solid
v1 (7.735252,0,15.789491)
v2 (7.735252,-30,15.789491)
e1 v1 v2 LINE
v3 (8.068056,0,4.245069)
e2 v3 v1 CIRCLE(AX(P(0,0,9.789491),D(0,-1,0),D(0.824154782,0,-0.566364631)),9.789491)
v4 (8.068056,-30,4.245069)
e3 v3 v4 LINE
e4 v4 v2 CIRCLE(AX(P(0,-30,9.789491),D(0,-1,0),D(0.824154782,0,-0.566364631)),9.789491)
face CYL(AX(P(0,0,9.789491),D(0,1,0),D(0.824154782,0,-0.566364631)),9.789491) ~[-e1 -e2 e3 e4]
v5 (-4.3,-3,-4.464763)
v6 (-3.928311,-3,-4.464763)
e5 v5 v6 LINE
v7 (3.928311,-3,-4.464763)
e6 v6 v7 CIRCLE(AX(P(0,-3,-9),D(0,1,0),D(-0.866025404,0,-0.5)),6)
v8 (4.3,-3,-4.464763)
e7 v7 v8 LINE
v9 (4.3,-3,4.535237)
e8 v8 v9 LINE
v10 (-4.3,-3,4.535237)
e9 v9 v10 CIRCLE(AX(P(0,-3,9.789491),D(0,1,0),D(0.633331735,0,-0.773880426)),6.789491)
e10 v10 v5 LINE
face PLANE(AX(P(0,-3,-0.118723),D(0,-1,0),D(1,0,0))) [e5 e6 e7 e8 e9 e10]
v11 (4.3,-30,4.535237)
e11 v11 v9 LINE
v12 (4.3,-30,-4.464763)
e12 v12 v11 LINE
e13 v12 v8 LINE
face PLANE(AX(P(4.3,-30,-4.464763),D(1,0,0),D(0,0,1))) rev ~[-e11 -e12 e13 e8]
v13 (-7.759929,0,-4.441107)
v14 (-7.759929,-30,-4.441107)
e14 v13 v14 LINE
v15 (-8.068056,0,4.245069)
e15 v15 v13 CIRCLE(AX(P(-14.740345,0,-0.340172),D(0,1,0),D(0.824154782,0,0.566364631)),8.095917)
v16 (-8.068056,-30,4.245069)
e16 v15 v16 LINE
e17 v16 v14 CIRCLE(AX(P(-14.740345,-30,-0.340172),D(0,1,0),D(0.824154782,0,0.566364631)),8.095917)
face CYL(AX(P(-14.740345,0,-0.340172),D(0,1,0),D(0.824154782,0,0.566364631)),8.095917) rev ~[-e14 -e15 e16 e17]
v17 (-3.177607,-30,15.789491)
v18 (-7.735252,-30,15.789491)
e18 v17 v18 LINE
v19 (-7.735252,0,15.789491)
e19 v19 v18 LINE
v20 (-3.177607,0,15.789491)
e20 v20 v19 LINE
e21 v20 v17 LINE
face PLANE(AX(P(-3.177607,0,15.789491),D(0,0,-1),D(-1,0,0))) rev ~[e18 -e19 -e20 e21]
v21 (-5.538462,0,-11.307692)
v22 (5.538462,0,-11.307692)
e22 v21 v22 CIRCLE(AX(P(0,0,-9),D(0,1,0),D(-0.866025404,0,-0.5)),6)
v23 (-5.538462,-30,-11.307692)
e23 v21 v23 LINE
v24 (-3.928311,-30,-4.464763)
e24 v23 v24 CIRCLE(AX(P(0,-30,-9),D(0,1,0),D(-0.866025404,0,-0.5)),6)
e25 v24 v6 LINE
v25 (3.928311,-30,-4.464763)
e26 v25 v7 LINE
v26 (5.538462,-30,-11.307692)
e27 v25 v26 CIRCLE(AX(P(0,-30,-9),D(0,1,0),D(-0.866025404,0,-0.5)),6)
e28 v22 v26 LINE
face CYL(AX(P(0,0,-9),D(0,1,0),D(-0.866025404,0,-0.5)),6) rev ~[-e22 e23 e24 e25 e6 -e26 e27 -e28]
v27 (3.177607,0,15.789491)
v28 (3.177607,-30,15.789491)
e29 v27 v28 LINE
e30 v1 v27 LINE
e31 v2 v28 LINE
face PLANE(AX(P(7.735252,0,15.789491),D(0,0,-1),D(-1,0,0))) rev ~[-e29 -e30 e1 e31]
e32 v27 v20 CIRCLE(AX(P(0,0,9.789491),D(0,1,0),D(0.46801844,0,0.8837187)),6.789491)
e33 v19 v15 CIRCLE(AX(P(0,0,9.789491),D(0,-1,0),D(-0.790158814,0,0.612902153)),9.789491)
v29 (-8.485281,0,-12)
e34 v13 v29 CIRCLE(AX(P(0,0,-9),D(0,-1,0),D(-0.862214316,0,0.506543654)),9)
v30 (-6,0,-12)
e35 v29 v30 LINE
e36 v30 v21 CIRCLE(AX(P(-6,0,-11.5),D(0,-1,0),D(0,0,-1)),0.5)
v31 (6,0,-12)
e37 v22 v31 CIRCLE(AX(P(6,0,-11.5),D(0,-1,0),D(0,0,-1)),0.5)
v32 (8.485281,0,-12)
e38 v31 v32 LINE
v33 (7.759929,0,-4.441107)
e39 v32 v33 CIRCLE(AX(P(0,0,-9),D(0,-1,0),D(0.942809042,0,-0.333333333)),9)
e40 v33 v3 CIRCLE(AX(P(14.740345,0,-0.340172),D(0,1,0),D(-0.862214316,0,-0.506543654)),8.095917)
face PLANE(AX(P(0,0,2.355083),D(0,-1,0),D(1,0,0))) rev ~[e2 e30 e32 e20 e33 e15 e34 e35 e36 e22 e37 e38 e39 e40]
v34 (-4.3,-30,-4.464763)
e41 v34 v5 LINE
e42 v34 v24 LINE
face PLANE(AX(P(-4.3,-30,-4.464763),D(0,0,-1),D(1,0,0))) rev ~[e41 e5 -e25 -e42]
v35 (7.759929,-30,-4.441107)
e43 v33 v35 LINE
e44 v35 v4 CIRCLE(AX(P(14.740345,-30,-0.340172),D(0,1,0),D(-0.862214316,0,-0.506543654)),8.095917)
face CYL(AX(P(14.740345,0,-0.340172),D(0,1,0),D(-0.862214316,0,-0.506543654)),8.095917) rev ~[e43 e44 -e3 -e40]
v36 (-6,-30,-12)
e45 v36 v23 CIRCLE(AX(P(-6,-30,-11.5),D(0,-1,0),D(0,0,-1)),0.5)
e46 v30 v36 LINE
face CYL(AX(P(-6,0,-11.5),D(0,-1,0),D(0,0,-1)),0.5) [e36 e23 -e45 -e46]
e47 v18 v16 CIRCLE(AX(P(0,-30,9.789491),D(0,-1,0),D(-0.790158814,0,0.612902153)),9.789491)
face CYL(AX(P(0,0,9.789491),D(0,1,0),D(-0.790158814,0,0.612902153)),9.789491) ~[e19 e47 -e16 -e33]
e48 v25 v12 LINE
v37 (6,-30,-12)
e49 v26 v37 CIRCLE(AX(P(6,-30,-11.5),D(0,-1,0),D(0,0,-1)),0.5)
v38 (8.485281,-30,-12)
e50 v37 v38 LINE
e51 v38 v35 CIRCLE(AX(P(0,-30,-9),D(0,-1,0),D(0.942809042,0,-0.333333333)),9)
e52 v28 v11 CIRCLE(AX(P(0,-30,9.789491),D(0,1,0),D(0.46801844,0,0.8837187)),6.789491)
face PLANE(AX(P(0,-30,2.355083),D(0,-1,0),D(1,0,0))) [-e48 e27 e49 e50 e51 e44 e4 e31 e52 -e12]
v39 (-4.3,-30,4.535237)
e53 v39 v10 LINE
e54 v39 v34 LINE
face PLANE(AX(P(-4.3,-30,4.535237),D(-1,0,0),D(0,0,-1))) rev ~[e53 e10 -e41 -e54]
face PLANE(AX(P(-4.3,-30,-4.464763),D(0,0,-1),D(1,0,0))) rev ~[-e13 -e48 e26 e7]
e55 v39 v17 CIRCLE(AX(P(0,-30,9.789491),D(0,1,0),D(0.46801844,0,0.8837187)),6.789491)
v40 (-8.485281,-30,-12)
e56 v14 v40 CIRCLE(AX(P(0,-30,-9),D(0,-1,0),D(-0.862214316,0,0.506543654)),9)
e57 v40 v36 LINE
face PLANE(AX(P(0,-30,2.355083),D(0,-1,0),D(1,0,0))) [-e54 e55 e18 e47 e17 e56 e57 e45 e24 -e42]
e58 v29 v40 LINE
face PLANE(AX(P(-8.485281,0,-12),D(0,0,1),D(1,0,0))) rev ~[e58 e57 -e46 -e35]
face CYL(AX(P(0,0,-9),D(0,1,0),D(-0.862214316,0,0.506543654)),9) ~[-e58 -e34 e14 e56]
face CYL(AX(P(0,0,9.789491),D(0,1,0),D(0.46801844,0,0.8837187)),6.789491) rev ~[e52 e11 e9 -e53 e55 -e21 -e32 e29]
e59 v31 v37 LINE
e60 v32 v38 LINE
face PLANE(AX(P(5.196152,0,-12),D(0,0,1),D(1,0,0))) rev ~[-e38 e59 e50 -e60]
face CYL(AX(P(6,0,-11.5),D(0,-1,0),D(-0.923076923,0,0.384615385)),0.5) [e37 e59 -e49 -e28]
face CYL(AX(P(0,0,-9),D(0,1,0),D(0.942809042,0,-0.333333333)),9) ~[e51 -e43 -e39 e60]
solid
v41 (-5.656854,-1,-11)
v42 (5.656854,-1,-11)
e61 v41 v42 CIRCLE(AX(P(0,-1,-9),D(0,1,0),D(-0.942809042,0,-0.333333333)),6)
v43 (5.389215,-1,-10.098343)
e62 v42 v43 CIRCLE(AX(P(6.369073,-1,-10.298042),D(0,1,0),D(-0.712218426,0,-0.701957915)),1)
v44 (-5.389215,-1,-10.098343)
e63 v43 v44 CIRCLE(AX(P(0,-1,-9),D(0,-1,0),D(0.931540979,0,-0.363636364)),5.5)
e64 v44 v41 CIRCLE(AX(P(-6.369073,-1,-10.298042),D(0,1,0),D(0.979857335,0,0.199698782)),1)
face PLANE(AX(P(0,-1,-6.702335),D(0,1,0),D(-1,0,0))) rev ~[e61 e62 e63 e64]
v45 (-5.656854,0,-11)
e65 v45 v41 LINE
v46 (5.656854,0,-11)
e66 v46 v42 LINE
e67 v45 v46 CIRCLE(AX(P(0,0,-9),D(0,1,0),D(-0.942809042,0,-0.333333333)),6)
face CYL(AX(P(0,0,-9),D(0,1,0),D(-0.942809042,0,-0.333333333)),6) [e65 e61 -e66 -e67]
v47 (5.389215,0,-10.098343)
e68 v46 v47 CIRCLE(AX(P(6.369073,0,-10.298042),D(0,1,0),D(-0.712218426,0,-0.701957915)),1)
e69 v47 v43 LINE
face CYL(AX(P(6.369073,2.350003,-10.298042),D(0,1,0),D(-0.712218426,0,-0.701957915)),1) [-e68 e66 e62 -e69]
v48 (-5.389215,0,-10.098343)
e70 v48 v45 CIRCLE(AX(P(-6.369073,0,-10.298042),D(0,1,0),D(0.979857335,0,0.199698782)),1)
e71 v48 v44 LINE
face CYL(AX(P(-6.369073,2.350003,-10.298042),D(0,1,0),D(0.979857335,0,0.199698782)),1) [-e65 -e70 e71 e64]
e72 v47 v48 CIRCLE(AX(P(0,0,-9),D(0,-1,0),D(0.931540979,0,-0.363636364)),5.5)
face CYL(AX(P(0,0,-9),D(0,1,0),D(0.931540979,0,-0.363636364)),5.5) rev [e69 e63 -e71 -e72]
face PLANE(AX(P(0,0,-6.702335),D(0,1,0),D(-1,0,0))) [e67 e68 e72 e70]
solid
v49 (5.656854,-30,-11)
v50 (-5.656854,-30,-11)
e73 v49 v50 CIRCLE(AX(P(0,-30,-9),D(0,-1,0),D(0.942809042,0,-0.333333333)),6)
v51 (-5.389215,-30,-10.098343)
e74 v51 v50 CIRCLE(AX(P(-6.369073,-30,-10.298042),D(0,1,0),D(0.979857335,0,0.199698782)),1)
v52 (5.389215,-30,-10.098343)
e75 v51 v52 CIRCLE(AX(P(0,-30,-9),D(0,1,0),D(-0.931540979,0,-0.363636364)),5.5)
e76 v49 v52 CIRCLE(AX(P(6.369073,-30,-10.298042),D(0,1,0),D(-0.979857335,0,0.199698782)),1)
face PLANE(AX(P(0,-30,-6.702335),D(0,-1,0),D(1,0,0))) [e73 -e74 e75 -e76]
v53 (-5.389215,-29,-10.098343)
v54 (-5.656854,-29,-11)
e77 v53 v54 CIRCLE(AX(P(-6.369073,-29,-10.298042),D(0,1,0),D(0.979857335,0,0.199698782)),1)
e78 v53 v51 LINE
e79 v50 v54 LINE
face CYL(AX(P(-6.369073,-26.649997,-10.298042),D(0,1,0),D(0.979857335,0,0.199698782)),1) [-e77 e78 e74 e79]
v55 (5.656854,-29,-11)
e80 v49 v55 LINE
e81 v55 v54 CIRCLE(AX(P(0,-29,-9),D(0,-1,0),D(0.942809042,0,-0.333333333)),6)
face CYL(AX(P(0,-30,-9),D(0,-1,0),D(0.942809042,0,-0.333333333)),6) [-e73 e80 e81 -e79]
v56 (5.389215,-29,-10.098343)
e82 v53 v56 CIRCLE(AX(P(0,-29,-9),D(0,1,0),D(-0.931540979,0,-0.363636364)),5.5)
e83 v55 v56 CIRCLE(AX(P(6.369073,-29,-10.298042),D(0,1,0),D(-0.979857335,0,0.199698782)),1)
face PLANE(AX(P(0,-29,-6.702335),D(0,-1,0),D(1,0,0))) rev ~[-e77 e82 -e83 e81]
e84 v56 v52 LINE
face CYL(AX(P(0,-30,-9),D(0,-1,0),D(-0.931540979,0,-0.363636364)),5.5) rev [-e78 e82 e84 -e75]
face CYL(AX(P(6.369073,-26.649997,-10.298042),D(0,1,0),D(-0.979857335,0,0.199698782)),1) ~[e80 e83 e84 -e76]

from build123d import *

# Parameters (mm, degrees)
F1_DEPTH      = 30
F3_DEPTH      = 27
F5_DEPTH      = 1
F7_DEPTH      = 1
F8_T1_DEPTH   = 5.7000067135
F8_2_T1_DEPTH = 5.7000067135
F9_R          = 0.5


# Not quite as in the source:
# - a fillet or chamfer that OpenCascade refuses, or shapes differently, is made with other operations: its cross-section is extruded or revolved along the edge and cut away or added


with BuildPart() as f1:
    # F0 (on Front) → F1 (new body)
    with BuildSketch(Plane.XZ):
        with BuildLine():
            ThreePointArc((3.1776069014, 15.7894908219), (0, 3), (-3.1776069014, 15.7894908219))
            Line((-3.1776069014, 15.7894908219), (-7.7352524556, 15.7894908219))
            ThreePointArc((-7.7352524556, 15.7894908219), (-9.7854255442, 10.0715856127), (-8.0680556753, 4.245069466))
            ThreePointArc((-8.0680556753, 4.245069466), (-6.6495163105, -0.0531637642), (-7.7599288431, -4.4411071136))
            ThreePointArc((-7.7599288431, -4.4411071136), (-8.9588464195, -8.1403077112), (-8.4852813742, -12))
            Line((-8.4852813742, -12), (-5.1961524227, -12))
            ThreePointArc((-5.1961524227, -12), (0, -3), (5.1961524227, -12))
            Line((5.1961524227, -12), (8.4852813742, -12))
            ThreePointArc((8.4852813742, -12), (8.9588464195, -8.1403077112), (7.7599288431, -4.4411071136))
            ThreePointArc((7.7599288431, -4.4411071136), (6.6495163105, -0.0531637642), (8.0680556753, 4.245069466))
            ThreePointArc((8.0680556753, 4.245069466), (9.7854255442, 10.0715856127), (7.7352524556, 15.7894908219))
            Line((7.7352524556, 15.7894908219), (3.1776069014, 15.7894908219))
        make_face()
    extrude(amount=F1_DEPTH)

    # F2 (on face) → F3 (cut)
    with BuildSketch(Plane.XZ.offset(30)):
        with BuildLine():
            ThreePointArc((4.3, 4.535236772), (0, 3), (-4.3, 4.535236772))
            Line((-4.3, 4.535236772), (-4.3, -4.464763228))
            Line((-4.3, -4.464763228), (4.3, -4.464763228))
            Line((4.3, -4.464763228), (4.3, 4.535236772))
        make_face()
    extrude(amount=-F3_DEPTH, mode=Mode.SUBTRACT)

    # F9
    f9_edges = [f1.edges().sort_by_distance(p)[0] for p in [
        (5.196152, -15, -12),
        (-5.196152, -15, -12),
    ]]
    fillet(f9_edges, radius=F9_R)


with BuildPart() as f5:
    # F4 (on face) → F5 (new body)
    with BuildSketch(Plane.XZ.offset(30)):
        with BuildLine():
            Line((5.123475383, -11), (5.6568542495, -11))
            ThreePointArc((5.6568542495, -11), (0, -3), (-5.6568542495, -11))
            Line((-5.6568542495, -11), (-5.123475383, -11))
            ThreePointArc((-5.123475383, -11), (0, -3.5), (5.123475383, -11))
        make_face()
    extrude(amount=-F5_DEPTH)

    # F8: fillet of radius 1 on 2 edges, made by hand

    # F8_s2 → F8_t1 (cut)
    with BuildSketch(Plane.XZ.offset(26.6499966433)):
        with BuildLine():
            ThreePointArc((5.3892153407, -10.0983433031), (5.4104140841, -10.5826008761), (5.6568542495, -11))
            Line((5.6568542495, -11), (5.123475383, -11))
            ThreePointArc((5.123475383, -11), (5.2756433506, -10.5548592339), (5.3892153407, -10.0983433031))
        make_face()
        with BuildLine():
            ThreePointArc((-5.3892153407, -10.0983433031), (-5.4104140841, -10.5826008761), (-5.6568542495, -11))
            Line((-5.6568542495, -11), (-5.123475383, -11))
            ThreePointArc((-5.123475383, -11), (-5.2756433506, -10.5548592339), (-5.3892153407, -10.0983433031))
        make_face()
    extrude(amount=F8_T1_DEPTH, mode=Mode.SUBTRACT)


with BuildPart() as f7:
    # F6 (on face) → F7 (new body)
    with BuildSketch(Plane(origin=(0, 0, 0), x_dir=(-1, 0, 0), z_dir=(0, 1, 0))):
        with BuildLine():
            ThreePointArc((5.6568542495, -11), (0, -3), (-5.6568542495, -11))
            Line((-5.6568542495, -11), (-5.123475383, -11))
            ThreePointArc((-5.123475383, -11), (0, -3.5), (5.123475383, -11))
            Line((5.123475383, -11), (5.6568542495, -11))
        make_face()
    extrude(amount=-F7_DEPTH)

    # F8#2: fillet of radius 1 on 2 edges, made by hand

    # F8_2_s2 → F8_2_t1 (cut)
    with BuildSketch(Plane.XZ.offset(-2.3500033567)):
        with BuildLine():
            ThreePointArc((5.6568542495, -11), (5.4104140841, -10.5826008761), (5.3892153407, -10.0983433031))
            ThreePointArc((5.3892153407, -10.0983433031), (5.2756433506, -10.5548592339), (5.123475383, -11))
            Line((5.123475383, -11), (5.6568542495, -11))
        make_face()
        with BuildLine():
            ThreePointArc((-5.3892153407, -10.0983433031), (-5.4104140841, -10.5826008761), (-5.6568542495, -11))
            Line((-5.6568542495, -11), (-5.123475383, -11))
            ThreePointArc((-5.123475383, -11), (-5.2756433506, -10.5548592339), (-5.3892153407, -10.0983433031))
        make_face()
    extrude(amount=F8_2_T1_DEPTH, mode=Mode.SUBTRACT)


solid = Compound([f1.part, f5.part, f7.part])
